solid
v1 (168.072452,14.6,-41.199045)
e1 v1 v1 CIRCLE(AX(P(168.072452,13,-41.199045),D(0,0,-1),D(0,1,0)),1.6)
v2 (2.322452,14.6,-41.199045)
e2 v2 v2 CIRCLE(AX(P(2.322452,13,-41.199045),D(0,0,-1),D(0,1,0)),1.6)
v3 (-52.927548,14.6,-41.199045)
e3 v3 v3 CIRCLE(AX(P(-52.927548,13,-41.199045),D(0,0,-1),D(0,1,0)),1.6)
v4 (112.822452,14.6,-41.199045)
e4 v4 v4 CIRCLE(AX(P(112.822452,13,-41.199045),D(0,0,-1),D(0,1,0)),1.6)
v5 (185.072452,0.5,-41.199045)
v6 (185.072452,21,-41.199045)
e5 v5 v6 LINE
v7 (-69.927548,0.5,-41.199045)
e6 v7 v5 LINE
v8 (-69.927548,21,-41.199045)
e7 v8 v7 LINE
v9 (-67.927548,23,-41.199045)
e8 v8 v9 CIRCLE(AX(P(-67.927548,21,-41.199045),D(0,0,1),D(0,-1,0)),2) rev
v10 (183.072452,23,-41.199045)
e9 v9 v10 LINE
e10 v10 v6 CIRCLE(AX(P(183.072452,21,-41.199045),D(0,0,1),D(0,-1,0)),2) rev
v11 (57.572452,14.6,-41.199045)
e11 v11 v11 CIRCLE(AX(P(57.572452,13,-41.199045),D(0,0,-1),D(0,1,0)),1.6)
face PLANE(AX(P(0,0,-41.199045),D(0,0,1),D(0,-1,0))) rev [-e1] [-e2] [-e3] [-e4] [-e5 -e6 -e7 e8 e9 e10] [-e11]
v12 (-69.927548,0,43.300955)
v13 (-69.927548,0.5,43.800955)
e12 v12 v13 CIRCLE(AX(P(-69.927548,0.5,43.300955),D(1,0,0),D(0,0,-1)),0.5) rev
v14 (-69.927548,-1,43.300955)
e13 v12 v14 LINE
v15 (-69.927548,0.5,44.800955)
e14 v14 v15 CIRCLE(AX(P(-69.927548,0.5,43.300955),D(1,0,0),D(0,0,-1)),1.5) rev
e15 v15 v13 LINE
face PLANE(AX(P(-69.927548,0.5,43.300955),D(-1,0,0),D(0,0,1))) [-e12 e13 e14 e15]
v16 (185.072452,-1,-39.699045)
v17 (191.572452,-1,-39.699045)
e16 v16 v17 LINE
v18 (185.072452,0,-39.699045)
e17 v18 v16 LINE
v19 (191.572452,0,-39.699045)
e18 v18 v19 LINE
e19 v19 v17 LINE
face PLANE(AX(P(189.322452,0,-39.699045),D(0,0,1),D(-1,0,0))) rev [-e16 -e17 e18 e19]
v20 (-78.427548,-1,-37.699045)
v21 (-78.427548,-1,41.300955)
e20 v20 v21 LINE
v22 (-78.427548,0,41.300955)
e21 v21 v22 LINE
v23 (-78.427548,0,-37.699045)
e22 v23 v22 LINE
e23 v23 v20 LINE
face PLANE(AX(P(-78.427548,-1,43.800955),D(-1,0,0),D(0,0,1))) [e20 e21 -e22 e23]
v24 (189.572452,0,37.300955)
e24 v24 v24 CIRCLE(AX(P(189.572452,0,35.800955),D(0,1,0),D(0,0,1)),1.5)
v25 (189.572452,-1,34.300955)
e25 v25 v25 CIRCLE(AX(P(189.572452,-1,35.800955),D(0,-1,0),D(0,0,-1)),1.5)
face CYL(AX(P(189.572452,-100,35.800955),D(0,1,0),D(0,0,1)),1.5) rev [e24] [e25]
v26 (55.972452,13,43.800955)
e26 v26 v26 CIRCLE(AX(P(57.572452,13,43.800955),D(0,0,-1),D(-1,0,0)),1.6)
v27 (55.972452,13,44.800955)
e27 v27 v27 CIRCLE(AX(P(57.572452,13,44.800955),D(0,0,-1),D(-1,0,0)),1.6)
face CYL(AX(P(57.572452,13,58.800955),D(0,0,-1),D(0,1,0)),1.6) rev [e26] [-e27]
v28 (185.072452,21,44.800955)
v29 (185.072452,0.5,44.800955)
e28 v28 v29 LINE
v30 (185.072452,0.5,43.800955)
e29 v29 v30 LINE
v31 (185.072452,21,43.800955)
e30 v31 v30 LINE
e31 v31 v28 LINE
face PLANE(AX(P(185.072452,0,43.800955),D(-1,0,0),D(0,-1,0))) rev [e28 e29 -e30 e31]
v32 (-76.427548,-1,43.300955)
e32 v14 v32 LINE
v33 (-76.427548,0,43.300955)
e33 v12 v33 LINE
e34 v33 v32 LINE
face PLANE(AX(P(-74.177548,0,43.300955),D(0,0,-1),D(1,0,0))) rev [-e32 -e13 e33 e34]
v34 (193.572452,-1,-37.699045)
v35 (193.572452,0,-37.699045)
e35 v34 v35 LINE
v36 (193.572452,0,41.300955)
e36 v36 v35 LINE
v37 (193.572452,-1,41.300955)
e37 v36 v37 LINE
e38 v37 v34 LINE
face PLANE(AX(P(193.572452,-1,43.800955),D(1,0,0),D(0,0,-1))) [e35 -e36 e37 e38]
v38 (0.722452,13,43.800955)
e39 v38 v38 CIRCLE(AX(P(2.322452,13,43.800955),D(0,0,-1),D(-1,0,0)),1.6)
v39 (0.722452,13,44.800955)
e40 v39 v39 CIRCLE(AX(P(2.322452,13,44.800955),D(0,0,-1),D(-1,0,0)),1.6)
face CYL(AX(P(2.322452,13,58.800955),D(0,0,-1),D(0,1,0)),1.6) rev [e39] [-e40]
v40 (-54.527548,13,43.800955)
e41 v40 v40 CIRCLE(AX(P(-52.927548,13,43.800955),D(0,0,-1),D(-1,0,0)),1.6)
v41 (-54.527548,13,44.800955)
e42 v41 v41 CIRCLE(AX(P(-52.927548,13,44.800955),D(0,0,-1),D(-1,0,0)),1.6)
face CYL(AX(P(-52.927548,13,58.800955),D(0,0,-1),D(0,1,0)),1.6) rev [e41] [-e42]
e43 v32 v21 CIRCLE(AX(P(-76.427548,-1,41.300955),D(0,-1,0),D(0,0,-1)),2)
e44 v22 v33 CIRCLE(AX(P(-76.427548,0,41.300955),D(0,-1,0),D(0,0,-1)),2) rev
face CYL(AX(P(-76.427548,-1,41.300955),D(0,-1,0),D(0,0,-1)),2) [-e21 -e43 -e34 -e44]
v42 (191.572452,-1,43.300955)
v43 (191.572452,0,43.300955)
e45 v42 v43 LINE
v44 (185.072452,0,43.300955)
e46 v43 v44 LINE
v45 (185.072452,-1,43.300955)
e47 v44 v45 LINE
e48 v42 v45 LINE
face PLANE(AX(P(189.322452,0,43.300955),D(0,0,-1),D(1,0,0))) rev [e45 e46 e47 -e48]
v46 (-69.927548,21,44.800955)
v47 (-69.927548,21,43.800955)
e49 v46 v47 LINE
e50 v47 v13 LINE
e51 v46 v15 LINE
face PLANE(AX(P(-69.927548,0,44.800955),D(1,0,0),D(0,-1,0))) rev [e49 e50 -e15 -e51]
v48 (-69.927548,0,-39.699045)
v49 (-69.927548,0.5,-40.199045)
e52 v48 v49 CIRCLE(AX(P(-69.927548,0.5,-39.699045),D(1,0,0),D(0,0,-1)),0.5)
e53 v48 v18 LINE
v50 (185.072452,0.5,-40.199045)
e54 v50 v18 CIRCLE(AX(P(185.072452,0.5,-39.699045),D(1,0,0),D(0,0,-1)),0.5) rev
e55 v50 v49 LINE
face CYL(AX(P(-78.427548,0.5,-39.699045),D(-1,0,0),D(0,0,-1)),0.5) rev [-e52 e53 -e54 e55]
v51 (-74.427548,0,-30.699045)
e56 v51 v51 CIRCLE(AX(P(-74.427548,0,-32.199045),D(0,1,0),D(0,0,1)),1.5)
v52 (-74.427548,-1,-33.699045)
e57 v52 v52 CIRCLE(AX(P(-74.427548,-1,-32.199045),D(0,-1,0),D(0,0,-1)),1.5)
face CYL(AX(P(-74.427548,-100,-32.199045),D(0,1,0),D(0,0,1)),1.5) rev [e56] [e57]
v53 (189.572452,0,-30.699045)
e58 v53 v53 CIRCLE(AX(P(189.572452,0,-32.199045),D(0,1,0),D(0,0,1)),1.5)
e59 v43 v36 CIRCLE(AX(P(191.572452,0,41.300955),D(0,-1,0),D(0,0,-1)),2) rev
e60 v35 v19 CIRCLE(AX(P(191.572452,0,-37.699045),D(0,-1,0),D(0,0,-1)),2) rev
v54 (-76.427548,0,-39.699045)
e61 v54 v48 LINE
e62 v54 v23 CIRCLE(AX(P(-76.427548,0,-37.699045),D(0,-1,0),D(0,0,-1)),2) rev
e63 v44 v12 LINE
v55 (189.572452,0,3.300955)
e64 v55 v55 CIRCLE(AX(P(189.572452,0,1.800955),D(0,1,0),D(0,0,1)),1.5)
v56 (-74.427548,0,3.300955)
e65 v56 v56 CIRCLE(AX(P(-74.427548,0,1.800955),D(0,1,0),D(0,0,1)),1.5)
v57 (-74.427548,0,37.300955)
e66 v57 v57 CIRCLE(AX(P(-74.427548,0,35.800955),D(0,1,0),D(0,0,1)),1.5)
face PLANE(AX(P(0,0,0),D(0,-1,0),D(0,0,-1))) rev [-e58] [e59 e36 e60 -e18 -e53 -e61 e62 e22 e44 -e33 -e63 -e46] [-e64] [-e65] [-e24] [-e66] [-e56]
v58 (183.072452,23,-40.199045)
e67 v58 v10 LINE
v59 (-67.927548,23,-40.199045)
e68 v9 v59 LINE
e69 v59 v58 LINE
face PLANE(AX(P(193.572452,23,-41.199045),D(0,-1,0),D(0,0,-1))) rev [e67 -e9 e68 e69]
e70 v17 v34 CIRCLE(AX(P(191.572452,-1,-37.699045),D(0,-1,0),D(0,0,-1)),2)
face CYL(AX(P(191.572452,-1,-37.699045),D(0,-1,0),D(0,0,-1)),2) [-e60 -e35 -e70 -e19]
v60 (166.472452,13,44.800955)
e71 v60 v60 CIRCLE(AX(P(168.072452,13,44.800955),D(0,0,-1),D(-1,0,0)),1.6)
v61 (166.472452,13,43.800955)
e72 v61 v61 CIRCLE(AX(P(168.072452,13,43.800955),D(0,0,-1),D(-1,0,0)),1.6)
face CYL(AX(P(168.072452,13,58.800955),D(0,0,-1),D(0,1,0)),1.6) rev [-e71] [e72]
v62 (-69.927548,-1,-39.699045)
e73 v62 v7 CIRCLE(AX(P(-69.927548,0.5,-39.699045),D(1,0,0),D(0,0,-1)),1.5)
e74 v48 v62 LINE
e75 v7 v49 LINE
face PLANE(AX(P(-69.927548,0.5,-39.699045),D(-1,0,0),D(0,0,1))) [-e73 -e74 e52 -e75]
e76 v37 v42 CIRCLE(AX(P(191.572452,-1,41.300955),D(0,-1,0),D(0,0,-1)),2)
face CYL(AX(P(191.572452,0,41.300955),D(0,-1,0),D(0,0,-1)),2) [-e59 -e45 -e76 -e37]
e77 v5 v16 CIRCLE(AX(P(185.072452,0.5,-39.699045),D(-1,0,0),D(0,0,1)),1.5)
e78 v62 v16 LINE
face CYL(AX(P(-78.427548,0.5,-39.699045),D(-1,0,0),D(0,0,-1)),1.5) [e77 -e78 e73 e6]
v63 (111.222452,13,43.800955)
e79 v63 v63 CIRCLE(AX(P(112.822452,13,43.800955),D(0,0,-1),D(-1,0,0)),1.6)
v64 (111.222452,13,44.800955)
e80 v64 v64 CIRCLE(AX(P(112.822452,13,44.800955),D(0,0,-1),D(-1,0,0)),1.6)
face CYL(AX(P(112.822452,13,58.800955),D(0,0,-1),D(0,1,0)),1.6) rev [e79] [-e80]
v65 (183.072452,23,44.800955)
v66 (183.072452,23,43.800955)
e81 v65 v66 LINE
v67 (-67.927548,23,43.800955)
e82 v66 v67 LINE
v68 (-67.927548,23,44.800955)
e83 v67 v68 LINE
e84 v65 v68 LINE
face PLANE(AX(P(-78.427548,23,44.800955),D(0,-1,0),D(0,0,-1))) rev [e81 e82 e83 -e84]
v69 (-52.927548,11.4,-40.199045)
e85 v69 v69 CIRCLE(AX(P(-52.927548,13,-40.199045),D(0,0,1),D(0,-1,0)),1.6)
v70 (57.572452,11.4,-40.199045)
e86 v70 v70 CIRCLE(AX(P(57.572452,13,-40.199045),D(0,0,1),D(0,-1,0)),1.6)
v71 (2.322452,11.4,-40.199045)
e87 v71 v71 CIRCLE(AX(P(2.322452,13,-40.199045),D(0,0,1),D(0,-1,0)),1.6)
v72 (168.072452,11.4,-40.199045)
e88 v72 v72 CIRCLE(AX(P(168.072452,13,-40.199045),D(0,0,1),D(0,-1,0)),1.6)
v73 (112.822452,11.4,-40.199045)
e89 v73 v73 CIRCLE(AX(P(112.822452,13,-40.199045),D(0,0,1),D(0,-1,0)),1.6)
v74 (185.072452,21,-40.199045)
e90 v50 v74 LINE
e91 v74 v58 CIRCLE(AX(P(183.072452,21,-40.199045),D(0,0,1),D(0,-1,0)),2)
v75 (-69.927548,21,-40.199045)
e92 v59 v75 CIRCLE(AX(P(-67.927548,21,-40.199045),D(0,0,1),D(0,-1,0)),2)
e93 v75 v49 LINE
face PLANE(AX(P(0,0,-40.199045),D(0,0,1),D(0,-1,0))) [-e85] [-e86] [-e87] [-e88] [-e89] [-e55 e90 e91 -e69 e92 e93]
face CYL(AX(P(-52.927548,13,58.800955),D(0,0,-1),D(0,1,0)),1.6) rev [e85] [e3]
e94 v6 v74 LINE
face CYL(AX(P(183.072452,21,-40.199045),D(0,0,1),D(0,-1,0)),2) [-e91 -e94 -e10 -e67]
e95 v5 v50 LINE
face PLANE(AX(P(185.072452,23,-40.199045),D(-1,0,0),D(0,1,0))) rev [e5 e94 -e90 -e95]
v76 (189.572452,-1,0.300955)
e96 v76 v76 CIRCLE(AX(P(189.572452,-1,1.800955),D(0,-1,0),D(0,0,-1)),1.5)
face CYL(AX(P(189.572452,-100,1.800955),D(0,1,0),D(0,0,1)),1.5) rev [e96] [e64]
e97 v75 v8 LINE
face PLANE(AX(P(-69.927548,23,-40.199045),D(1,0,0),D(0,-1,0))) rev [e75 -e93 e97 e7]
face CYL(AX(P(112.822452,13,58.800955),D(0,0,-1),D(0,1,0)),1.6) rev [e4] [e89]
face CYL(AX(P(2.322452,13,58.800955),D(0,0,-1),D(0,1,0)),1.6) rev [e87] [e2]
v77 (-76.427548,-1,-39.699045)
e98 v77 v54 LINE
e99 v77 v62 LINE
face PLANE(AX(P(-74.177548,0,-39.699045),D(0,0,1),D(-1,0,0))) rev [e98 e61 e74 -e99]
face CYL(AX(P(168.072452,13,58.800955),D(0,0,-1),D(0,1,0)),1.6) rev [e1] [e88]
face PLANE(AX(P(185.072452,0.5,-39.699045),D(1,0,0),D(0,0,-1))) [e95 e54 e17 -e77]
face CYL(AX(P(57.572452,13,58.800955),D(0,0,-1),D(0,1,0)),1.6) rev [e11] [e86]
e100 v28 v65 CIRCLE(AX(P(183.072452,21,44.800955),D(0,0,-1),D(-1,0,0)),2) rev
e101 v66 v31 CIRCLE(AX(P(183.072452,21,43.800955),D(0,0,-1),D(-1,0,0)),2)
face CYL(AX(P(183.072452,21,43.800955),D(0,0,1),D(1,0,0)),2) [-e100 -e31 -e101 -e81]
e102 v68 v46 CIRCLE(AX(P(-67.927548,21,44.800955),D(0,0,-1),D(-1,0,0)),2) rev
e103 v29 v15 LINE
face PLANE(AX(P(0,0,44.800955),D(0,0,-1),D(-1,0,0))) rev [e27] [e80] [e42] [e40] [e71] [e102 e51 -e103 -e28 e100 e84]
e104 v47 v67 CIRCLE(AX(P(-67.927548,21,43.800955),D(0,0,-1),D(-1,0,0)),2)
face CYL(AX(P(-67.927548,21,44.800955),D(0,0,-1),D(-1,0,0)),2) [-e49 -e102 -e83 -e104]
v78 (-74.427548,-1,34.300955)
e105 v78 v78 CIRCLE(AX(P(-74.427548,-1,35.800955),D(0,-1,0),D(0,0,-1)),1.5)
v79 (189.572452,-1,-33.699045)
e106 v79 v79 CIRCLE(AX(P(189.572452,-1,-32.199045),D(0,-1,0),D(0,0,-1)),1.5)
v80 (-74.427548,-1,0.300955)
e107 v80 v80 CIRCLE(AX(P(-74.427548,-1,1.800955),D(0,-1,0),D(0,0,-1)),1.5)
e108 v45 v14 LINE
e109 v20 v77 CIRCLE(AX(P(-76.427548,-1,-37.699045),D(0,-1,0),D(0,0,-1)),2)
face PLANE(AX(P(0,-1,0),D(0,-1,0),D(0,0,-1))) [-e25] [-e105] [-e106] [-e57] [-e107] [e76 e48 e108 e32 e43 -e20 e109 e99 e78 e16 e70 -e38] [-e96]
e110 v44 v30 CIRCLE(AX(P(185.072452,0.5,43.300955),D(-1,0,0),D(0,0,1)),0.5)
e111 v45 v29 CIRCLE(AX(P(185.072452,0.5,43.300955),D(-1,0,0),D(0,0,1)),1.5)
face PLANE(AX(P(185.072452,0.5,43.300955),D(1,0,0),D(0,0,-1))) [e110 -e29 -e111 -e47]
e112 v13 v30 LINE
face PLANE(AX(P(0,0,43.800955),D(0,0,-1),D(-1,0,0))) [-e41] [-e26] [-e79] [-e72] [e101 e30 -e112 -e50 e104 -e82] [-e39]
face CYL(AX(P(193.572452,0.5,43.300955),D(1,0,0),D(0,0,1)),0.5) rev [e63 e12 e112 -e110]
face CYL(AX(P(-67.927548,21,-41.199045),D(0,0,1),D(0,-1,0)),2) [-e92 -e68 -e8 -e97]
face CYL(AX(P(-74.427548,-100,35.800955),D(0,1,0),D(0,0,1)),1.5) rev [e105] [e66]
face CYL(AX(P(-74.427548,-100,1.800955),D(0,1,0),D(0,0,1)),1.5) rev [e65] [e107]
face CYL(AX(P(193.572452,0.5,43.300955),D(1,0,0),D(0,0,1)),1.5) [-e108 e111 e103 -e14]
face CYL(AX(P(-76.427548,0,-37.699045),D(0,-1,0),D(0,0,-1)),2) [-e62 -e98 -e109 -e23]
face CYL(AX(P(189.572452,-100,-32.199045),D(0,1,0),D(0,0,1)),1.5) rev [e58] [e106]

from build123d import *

# Parameters (mm, degrees)
SKETCH1_W                      = 272
SKETCH1_H                      = 84
BASE_FLANGE1_DEPTH             = 1
EDGE_FLANGE1_STRIP_W           = 5
EDGE_FLANGE1_STRIP_H           = 1
EDGE_FLANGE1_STRIP_CUT_DEPTH   = 272
EDGE_FLANGE1_STRIP_2_W         = 5
EDGE_FLANGE1_STRIP_2_H         = 1
EDGE_FLANGE1_STRIP_CUT_2_DEPTH = 272
EDGE_FLANGE1_DEPTH             = 272
EDGE_FLANGE1_BEND_DEPTH        = 272
CUT_EXTRUDE1_START             = -78.427547771
CUT_EXTRUDE1_DEPTH             = 8.5
CUT_EXTRUDE1_START_2           = 185.072452229
CUT_EXTRUDE1_2_DEPTH           = 8.5
SKETCH13_R                     = 1.6
CUT_EXTRUDE2_DEPTH             = 100
SKETCH14_R                     = 1.5
CUT_EXTRUDE3_DEPTH             = 100
FILLET1_R                      = 2
FILLET2_R                      = 2
FILLET3_R                      = 2
FILLET4_R                      = 2
FILLET5_R                      = 2
FILLET6_R                      = 2
FILLET7_R                      = 2
FILLET8_R                      = 2


# Read off the part's stored shape, not the designer's step: Cut-Extrude1
# Sheet-metal steps are written as plain solids
with BuildPart() as part:
    # Sketch1 → Base-Flange1 (new body)
    with BuildSketch(Plane(origin=(0, 0, 0), x_dir=(1, 0, 0), z_dir=(0, 1, 0))):
        with Locations((57.572452229, -1.800955414)):
            Rectangle(SKETCH1_W, SKETCH1_H)
    extrude(amount=-BASE_FLANGE1_DEPTH)

    # Edge-Flange1 strip (across the edge) → Edge-Flange1 strip cut (cut)
    with BuildSketch(Plane(origin=(-78.427547771, 0, 43.800955414), x_dir=(0, 0, -1), z_dir=(1, 0, 0))):
        with Locations((-2, -0.5)):
            Rectangle(EDGE_FLANGE1_STRIP_W, EDGE_FLANGE1_STRIP_H)
    extrude(amount=EDGE_FLANGE1_STRIP_CUT_DEPTH, mode=Mode.SUBTRACT)

    # Edge-Flange1 strip 2 (across the edge) → Edge-Flange1 strip cut 2 (cut)
    with BuildSketch(Plane(origin=(193.572452229, 0, -40.199044586), x_dir=(0, 0, 1), z_dir=(-1, 0, 0))):
        with Locations((-2, -0.5)):
            Rectangle(EDGE_FLANGE1_STRIP_2_W, EDGE_FLANGE1_STRIP_2_H)
    extrude(amount=EDGE_FLANGE1_STRIP_CUT_2_DEPTH, mode=Mode.SUBTRACT)

    # Edge-Flange1 section (across the edge) → Edge-Flange1 (add)
    with BuildSketch(Plane(origin=(-78.427547771, 0, 43.800955414), x_dir=(0, 0, -1), z_dir=(1, 0, 0))):
        with BuildLine():
            Line((-1, 0.5), (-1, 23))
            Line((-1, 23), (0, 23))
            Line((0, 23), (0, 0.5))
            ThreePointArc((0, 0.5), (0.146446609, 0.146446609), (0.5, 0))
            Line((0.5, 0), (0.5, -1))
            ThreePointArc((0.5, -1), (-0.560660172, -0.560660172), (-1, 0.5))
        make_face()
    extrude(amount=EDGE_FLANGE1_DEPTH)

    # Edge-Flange1 section 2 (across the edge) → Edge-Flange1 bend (add)
    with BuildSketch(Plane(origin=(193.572452229, 0, -40.199044586), x_dir=(0, 0, 1), z_dir=(-1, 0, 0))):
        with BuildLine():
            Line((-1, 0.5), (-1, 23))
            Line((-1, 23), (0, 23))
            Line((0, 23), (0, 0.5))
            ThreePointArc((0, 0.5), (0.146446609, 0.146446609), (0.5, 0))
            Line((0.5, 0), (0.5, -1))
            ThreePointArc((0.5, -1), (-0.560660172, -0.560660172), (-1, 0.5))
        make_face()
    extrude(amount=EDGE_FLANGE1_BEND_DEPTH)

    # Cut-Extrude1 outline → Cut-Extrude1 (cut)
    with BuildSketch(Plane.YZ.offset(CUT_EXTRUDE1_START)):
        with BuildLine():
            ThreePointArc((0.5, -40.199044586), (0.146446609, -40.052597977), (0, -39.699044586))
            Line((0, -39.699044586), (-1, -39.699044586))
            ThreePointArc((-1, -39.699044586), (-0.560660172, -40.759704758), (0.5, -41.199044586))
            Line((0.5, -41.199044586), (23, -41.199044586))
            Line((23, -41.199044586), (23, -40.199044586))
            Line((23, -40.199044586), (0.5, -40.199044586))
        make_face()
        with BuildLine():
            ThreePointArc((0.5, 44.800955414), (-0.560660172, 44.361615586), (-1, 43.300955414))
            Line((-1, 43.300955414), (0, 43.300955414))
            ThreePointArc((0, 43.300955414), (0.146446609, 43.654508805), (0.5, 43.800955414))
            Line((0.5, 43.800955414), (23, 43.800955414))
            Line((23, 43.800955414), (23, 44.800955414))
            Line((23, 44.800955414), (0.5, 44.800955414))
        make_face()
    extrude(amount=CUT_EXTRUDE1_DEPTH, mode=Mode.SUBTRACT)

    # Cut-Extrude1 2 outline → Cut-Extrude1 2 (cut)
    with BuildSketch(Plane.YZ.offset(CUT_EXTRUDE1_START_2)):
        with BuildLine():
            ThreePointArc((0.5, -40.199044586), (0.146446609, -40.052597977), (0, -39.699044586))
            Line((0, -39.699044586), (-1, -39.699044586))
            ThreePointArc((-1, -39.699044586), (-0.560660172, -40.759704758), (0.5, -41.199044586))
            Line((0.5, -41.199044586), (23, -41.199044586))
            Line((23, -41.199044586), (23, -40.199044586))
            Line((23, -40.199044586), (0.5, -40.199044586))
        make_face()
        with BuildLine():
            ThreePointArc((0.5, 44.800955414), (-0.560660172, 44.361615586), (-1, 43.300955414))
            Line((-1, 43.300955414), (0, 43.300955414))
            ThreePointArc((0, 43.300955414), (0.146446609, 43.654508805), (0.5, 43.800955414))
            Line((0.5, 43.800955414), (23, 43.800955414))
            Line((23, 43.800955414), (23, 44.800955414))
            Line((23, 44.800955414), (0.5, 44.800955414))
        make_face()
    extrude(amount=CUT_EXTRUDE1_2_DEPTH, mode=Mode.SUBTRACT)

    # Sketch13 → Cut-Extrude2 (cut)
    with BuildSketch(Plane(origin=(0, 0, -41.199044586), x_dir=(-1, 0, 0), z_dir=(0, 0, -1))):
        with Locations(Location((-168.072452229, 13, 0), (0, 0, 90))):
            Circle(SKETCH13_R)
        with Locations(Location((-112.822452229, 13, 0), (0, 0, 90))):
            Circle(SKETCH13_R)
        with Locations(Location((-57.572452229, 13, 0), (0, 0, 90))):
            Circle(SKETCH13_R)
        with Locations(Location((-2.322452229, 13, 0), (0, 0, 90))):
            Circle(SKETCH13_R)
        with Locations(Location((52.927547771, 13, 0), (0, 0, 90))):
            Circle(SKETCH13_R)
    extrude(amount=-CUT_EXTRUDE2_DEPTH, mode=Mode.SUBTRACT)

    # Sketch14 → Cut-Extrude3 (cut)
    with BuildSketch(Plane(origin=(0, 0, 0), x_dir=(1, 0, 0), z_dir=(0, 1, 0))):
        with Locations(Location((-74.427547771, -1.800955414, 0), (0, 0, 270))):
            Circle(SKETCH14_R)
        with Locations(Location((-74.427547771, 32.199044586, 0), (0, 0, 270))):
            Circle(SKETCH14_R)
        with Locations(Location((-74.427547771, -35.800955414, 0), (0, 0, 270))):
            Circle(SKETCH14_R)
        with Locations(Location((189.572452229, -35.800955414, 0), (0, 0, 270))):
            Circle(SKETCH14_R)
        with Locations(Location((189.572452229, -1.800955414, 0), (0, 0, 270))):
            Circle(SKETCH14_R)
        with Locations(Location((189.572452229, 32.199044586, 0), (0, 0, 270))):
            Circle(SKETCH14_R)
    extrude(amount=-CUT_EXTRUDE3_DEPTH, mode=Mode.SUBTRACT)

    # Fillet1
    fillet1_edges = [part.edges().sort_by_distance(p)[0] for p in [
        (193.572452229, -0.5, -39.699044586),
    ]]
    fillet(fillet1_edges, radius=FILLET1_R)

    # Fillet2
    fillet2_edges = [part.edges().sort_by_distance(p)[0] for p in [
        (193.572452229, -0.5, 43.300955414),
    ]]
    fillet(fillet2_edges, radius=FILLET2_R)

    # Fillet3
    fillet3_edges = [part.edges().sort_by_distance(p)[0] for p in [
        (-78.427547771, -0.5, -39.699044586),
    ]]
    fillet(fillet3_edges, radius=FILLET3_R)

    # Fillet4
    fillet4_edges = [part.edges().sort_by_distance(p)[0] for p in [
        (-78.427547771, -0.5, 43.300955414),
    ]]
    fillet(fillet4_edges, radius=FILLET4_R)

    # Fillet5
    fillet5_edges = [part.edges().sort_by_distance(p)[0] for p in [
        (185.072452229, 23, -40.699044586),
    ]]
    fillet(fillet5_edges, radius=FILLET5_R)

    # Fillet6
    fillet6_edges = [part.edges().sort_by_distance(p)[0] for p in [
        (-69.927547771, 23, -40.699044586),
    ]]
    fillet(fillet6_edges, radius=FILLET6_R)

    # Fillet7
    fillet7_edges = [part.edges().sort_by_distance(p)[0] for p in [
        (185.072452229, 23, 44.300955414),
    ]]
    fillet(fillet7_edges, radius=FILLET7_R)

    # Fillet8
    fillet8_edges = [part.edges().sort_by_distance(p)[0] for p in [
        (-69.927547771, 23, 44.300955414),
    ]]
    fillet(fillet8_edges, radius=FILLET8_R)


solid = part.part
